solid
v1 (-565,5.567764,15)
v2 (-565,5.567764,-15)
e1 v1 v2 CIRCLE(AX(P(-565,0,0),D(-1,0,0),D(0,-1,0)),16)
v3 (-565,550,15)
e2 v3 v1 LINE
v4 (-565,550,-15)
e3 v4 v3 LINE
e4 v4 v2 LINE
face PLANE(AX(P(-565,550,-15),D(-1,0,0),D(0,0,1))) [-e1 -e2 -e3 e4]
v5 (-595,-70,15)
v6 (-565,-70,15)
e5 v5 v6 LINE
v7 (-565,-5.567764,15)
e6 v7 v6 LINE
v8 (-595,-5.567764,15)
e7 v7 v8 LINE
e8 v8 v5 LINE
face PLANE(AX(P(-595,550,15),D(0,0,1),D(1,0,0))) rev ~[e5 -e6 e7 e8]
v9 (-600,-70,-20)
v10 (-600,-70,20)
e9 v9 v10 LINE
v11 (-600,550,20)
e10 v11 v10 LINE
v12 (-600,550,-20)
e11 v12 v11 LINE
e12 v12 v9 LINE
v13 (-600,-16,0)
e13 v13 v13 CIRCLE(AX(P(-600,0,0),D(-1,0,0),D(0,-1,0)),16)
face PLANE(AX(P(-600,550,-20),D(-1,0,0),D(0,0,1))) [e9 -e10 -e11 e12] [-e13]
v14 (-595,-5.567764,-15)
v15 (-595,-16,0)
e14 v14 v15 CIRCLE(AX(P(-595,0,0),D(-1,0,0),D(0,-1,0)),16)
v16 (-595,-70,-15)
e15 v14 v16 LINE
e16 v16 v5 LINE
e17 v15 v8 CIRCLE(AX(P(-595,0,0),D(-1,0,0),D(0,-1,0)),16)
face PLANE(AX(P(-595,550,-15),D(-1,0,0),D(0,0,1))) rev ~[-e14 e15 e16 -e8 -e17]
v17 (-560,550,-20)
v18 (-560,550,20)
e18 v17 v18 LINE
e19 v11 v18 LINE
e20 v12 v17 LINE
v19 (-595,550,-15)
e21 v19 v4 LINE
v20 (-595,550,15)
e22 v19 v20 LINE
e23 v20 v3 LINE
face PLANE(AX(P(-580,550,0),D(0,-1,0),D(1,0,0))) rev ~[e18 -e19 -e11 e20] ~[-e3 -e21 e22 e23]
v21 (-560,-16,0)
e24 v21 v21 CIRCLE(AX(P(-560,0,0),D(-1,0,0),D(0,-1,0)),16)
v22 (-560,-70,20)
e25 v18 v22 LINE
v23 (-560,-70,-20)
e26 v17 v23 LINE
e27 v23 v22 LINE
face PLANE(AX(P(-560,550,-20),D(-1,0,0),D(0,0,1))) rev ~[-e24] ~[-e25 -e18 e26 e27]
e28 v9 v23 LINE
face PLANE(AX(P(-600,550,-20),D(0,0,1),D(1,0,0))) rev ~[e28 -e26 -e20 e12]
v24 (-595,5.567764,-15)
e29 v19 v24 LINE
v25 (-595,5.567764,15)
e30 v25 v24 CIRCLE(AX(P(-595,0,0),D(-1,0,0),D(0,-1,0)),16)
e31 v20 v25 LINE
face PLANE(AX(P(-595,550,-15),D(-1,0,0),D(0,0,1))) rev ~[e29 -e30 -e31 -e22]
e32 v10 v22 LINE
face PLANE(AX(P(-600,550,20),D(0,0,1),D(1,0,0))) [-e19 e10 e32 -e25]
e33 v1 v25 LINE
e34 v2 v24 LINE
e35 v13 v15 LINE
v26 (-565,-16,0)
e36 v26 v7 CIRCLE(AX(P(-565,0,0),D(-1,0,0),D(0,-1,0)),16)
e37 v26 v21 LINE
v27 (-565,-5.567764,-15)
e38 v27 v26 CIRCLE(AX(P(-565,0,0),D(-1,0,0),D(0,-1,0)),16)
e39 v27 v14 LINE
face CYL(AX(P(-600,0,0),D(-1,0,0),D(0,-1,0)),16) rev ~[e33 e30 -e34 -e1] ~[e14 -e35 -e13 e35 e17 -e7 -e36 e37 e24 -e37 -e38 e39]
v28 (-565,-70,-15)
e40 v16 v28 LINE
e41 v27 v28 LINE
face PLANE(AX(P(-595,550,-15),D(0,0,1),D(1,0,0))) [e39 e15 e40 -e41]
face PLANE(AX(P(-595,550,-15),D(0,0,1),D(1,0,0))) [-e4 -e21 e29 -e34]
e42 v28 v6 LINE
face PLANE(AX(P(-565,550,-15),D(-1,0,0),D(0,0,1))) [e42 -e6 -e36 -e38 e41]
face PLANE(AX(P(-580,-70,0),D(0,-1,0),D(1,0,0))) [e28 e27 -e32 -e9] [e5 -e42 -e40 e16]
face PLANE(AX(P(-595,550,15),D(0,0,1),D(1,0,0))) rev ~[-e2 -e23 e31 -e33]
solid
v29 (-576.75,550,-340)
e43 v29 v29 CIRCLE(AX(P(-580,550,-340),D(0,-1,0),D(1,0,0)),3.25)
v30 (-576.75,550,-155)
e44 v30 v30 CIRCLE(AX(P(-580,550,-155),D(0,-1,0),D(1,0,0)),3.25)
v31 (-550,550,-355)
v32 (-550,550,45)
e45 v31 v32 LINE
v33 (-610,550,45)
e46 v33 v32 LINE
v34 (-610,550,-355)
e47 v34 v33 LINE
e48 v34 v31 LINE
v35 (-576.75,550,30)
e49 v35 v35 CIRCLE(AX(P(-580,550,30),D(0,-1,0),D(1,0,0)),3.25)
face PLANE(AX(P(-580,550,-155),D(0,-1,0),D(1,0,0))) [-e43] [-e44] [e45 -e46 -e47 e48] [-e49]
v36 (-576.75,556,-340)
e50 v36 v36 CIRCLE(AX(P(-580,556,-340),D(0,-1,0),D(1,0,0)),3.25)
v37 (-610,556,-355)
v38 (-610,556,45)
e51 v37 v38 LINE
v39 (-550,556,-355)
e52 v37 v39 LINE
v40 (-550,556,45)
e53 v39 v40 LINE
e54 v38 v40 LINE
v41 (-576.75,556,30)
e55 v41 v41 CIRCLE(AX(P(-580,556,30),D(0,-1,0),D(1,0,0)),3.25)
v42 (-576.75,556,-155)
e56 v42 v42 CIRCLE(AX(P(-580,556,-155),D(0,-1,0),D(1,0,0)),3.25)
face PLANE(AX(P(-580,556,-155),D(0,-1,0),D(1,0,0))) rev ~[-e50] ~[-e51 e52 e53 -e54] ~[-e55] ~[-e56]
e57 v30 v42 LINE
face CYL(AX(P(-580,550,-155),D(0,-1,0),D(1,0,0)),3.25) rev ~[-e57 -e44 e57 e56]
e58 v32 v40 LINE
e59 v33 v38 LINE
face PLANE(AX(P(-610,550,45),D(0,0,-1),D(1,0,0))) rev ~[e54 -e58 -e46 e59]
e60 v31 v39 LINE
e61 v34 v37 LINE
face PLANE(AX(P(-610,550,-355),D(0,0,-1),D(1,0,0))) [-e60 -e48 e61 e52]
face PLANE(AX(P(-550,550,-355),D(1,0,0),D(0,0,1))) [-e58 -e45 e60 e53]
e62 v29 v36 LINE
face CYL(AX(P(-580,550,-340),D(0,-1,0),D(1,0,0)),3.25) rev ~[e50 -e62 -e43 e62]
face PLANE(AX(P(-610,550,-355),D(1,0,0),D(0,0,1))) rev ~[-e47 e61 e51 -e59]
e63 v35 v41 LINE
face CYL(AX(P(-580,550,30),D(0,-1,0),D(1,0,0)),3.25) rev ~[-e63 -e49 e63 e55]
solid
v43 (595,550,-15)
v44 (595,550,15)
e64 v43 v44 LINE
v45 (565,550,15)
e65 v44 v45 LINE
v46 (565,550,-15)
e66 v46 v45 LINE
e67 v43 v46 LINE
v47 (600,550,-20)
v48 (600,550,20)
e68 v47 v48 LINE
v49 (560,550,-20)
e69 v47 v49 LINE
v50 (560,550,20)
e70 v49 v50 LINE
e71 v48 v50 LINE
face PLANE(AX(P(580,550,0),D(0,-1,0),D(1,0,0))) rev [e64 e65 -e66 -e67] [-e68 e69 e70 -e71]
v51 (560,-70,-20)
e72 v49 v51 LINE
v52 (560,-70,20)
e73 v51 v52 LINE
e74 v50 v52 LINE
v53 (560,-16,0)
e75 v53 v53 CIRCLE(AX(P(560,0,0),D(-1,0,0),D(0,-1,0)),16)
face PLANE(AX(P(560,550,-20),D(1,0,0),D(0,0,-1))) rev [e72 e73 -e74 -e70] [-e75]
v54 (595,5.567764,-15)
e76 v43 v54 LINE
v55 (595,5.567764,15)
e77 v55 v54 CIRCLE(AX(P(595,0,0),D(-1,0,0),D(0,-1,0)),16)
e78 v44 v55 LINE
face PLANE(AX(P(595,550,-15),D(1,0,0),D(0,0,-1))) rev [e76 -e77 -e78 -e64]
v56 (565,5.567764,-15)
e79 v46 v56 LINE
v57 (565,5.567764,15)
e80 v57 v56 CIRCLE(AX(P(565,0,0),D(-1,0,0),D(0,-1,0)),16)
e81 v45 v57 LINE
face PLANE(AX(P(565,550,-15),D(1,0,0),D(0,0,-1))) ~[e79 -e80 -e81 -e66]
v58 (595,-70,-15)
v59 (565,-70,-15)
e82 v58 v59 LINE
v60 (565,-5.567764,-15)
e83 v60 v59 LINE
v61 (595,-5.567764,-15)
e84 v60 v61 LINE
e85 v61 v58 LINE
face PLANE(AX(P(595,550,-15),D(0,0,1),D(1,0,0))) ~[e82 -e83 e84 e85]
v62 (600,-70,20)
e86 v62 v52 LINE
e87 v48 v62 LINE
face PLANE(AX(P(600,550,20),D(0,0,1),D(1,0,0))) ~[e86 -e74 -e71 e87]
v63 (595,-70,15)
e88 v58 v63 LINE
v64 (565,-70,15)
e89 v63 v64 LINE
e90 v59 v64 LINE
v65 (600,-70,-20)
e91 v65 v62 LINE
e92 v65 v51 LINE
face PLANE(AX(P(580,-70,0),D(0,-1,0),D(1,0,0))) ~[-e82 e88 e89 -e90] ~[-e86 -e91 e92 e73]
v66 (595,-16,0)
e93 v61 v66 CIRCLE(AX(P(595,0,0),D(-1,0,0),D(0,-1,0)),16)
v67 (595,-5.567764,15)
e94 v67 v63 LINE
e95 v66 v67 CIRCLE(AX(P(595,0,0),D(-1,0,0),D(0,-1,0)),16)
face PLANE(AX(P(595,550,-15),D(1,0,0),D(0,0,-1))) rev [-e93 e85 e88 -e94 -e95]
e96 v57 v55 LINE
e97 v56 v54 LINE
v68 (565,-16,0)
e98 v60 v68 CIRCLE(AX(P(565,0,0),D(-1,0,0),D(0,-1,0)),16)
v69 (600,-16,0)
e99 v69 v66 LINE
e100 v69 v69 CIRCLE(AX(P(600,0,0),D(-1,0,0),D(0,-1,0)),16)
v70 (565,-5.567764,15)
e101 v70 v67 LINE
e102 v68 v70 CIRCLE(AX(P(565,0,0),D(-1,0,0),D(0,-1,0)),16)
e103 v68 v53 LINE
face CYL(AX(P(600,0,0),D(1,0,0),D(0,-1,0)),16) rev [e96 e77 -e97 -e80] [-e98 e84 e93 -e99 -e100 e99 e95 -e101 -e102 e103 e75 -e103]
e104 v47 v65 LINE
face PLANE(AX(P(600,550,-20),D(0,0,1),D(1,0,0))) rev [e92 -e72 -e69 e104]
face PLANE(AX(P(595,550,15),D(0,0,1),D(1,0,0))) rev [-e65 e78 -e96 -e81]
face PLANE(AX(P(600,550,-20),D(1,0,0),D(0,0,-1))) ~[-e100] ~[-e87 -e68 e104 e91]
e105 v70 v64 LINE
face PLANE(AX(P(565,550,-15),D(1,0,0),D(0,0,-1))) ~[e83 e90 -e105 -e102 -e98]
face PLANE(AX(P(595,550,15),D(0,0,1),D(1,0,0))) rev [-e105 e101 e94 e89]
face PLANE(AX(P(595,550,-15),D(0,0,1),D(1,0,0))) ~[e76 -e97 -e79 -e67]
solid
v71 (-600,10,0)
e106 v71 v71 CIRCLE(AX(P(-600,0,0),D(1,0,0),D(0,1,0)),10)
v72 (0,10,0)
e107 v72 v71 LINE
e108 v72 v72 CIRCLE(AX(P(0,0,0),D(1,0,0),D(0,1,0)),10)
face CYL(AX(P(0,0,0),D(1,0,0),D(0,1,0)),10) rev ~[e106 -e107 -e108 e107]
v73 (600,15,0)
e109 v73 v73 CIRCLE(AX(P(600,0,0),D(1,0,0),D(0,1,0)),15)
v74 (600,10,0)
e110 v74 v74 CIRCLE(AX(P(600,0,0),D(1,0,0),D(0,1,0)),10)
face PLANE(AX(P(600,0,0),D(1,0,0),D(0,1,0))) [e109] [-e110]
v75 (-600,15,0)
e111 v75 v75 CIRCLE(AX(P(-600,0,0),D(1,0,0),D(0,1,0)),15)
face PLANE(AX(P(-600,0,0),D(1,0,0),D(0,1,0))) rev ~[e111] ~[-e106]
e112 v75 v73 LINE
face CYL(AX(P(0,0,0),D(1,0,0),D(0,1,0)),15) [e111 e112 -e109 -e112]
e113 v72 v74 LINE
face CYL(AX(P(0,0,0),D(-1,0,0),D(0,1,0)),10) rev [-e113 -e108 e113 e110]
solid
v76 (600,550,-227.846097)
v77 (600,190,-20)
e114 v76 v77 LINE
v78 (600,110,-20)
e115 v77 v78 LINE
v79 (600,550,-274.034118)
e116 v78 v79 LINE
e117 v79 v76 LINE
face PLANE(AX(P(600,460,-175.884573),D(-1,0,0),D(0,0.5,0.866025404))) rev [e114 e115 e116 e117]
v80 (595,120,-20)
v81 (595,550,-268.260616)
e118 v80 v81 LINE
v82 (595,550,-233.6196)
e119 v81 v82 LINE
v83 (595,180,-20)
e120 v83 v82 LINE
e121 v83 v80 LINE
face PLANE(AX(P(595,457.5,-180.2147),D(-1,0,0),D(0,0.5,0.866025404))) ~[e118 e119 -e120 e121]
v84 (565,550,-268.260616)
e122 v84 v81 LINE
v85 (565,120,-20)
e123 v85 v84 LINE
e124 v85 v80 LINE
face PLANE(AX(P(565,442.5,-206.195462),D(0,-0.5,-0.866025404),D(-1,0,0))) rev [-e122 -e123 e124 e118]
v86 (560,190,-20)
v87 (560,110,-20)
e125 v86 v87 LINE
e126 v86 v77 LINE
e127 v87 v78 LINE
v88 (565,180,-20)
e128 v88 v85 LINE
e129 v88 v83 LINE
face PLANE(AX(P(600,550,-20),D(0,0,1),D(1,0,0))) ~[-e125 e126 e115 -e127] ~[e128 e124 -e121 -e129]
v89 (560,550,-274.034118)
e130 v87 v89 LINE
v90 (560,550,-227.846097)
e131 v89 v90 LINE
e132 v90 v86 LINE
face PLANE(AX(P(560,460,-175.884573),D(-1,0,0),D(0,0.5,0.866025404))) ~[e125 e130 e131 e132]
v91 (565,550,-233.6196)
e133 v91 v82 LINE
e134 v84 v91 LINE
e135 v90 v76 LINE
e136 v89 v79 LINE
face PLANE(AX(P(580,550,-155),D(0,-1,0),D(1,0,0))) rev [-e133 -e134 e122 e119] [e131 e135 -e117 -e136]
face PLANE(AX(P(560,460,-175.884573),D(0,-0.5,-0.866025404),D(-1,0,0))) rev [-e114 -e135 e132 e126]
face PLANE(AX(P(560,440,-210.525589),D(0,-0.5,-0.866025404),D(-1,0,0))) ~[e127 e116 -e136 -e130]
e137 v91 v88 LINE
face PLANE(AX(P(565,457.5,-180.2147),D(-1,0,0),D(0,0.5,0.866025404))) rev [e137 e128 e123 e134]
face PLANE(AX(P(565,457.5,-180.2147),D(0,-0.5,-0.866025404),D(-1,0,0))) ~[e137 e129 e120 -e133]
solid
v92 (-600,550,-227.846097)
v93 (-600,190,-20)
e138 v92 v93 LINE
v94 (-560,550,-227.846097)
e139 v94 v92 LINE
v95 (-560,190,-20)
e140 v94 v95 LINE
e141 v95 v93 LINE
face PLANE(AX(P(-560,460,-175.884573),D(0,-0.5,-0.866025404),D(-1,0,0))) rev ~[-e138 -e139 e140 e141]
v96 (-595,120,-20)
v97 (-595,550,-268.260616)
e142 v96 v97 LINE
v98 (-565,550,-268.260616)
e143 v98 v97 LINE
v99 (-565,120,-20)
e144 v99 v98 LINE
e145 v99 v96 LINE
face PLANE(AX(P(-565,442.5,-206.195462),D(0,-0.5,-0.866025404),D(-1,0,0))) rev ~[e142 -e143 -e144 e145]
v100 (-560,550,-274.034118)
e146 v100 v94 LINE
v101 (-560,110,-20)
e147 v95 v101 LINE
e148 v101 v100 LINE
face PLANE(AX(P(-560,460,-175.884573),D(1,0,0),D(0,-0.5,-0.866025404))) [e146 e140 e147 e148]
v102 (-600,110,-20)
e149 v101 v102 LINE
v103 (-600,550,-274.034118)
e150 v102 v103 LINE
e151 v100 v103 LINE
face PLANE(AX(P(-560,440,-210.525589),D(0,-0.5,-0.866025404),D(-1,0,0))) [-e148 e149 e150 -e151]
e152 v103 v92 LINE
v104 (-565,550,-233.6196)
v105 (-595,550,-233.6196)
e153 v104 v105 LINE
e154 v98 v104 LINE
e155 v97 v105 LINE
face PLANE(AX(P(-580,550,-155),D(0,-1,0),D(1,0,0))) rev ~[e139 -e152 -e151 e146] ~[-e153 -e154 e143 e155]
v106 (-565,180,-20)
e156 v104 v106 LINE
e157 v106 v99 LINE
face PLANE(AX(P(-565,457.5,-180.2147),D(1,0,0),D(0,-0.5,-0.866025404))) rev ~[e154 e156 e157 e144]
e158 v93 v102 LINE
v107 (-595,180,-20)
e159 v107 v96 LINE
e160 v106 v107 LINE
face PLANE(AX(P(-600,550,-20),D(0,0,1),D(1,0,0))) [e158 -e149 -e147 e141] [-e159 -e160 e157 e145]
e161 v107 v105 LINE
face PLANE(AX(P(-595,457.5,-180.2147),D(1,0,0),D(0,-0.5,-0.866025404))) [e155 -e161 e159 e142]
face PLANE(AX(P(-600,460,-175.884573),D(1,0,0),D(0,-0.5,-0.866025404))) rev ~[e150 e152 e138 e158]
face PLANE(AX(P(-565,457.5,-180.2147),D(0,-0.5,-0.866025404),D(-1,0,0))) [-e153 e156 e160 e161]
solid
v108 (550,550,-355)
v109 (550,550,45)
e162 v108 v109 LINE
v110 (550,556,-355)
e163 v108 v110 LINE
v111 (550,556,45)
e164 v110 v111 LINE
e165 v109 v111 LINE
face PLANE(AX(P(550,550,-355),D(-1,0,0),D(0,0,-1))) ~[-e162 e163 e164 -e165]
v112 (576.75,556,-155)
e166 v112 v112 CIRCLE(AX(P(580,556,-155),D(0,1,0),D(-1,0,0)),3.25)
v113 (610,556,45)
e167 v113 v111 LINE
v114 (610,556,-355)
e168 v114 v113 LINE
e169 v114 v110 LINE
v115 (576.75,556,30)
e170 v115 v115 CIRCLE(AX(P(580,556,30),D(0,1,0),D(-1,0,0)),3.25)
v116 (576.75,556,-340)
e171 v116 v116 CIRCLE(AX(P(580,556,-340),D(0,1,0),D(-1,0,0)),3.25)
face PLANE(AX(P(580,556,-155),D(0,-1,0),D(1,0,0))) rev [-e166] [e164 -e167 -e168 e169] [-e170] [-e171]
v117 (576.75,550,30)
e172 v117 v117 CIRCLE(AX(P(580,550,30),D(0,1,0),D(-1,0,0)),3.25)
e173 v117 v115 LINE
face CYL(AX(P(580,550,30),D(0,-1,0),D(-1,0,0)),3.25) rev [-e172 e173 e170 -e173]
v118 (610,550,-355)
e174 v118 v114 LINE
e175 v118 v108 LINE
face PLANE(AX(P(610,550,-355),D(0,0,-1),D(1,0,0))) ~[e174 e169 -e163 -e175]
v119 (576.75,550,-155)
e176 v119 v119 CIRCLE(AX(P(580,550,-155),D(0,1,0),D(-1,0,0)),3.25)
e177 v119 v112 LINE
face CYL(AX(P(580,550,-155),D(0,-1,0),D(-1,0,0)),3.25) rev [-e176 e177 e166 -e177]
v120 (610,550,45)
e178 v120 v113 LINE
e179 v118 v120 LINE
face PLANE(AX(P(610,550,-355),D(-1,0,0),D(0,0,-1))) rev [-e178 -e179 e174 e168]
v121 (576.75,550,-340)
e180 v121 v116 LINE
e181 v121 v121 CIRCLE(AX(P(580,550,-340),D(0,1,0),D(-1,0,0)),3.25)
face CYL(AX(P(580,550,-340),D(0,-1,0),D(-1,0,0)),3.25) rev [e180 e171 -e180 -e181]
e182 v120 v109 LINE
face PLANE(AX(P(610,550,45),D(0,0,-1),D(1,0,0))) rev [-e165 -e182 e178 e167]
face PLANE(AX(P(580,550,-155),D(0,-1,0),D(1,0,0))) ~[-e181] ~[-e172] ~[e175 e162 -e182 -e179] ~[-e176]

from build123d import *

# Parameters (mm, degrees)
F0_R          = 15
F0_R_2        = 10
F1_DEPTH      = 600
F1_DEPTH_BACK = 600
F3_W          = 40
F3_H          = 40
F3_W_2        = 30
F3_H_2        = 30
F4_DEPTH      = 620
F5_R          = 16
F6_DEPTH      = 53.9
F7_W          = 60
F7_H          = 400
F7_R          = 3.25
F8_DEPTH      = 6
F10_W         = 40
F10_H         = 40
F10_W_2       = 30
F10_H_2       = 30
F11_FACE_W    = 40
F11_FACE_H    = 40
F11_FACE_W_2  = 30
F11_FACE_H_2  = 30
F12_REACH     = 626.0052928413


with BuildPart() as f1:
    # F0 (on Right) → F1 (new body, two sides)
    with BuildSketch(Plane.YZ) as f1_sk:
        Circle(F0_R)
        Circle(F0_R_2, mode=Mode.SUBTRACT)
    extrude(amount=F1_DEPTH)
    extrude(f1_sk.sketch, amount=-F1_DEPTH_BACK)


with BuildPart() as f4:
    # F3 (on offset) → F4 (new body)
    with BuildSketch(Plane.XZ.offset(-550)):
        with Locations((-580, 0)):
            Rectangle(F3_W, F3_H)
        with Locations((-580, 0)):
            Rectangle(F3_W_2, F3_H_2, mode=Mode.SUBTRACT)
    extrude(amount=F4_DEPTH)

    # F5 (on face) → F6 (cut)
    with BuildSketch(Plane(origin=(-600, 0, 0), x_dir=(0, -1, 0), z_dir=(-1, 0, 0))):
        Circle(F5_R)
    extrude(amount=-F6_DEPTH, mode=Mode.SUBTRACT)


with BuildPart() as f8:
    # F7 (on offset) → F8 (new body)
    with BuildSketch(Plane.XZ.offset(-550)):
        with Locations((-580, -155)):
            Rectangle(F7_W, F7_H)
        with Locations((-580, -340)):
            Circle(F7_R, mode=Mode.SUBTRACT)
        with Locations((-580, -155)):
            Circle(F7_R, mode=Mode.SUBTRACT)
        with Locations((-580, 30)):
            Circle(F7_R, mode=Mode.SUBTRACT)
    extrude(amount=-F8_DEPTH)


with BuildPart() as f11:
    # F10 (on face) → F11 (new body, up to the next surface of F8)
    with BuildSketch(Plane(origin=(0, 421.1602540378, -243.1569860407), x_dir=(-1, 0, 0), z_dir=(0, 0.8660254038, -0.5))):
        with Locations((580, 57.6794919243)):
            Rectangle(F10_W, F10_H)
        with Locations((580, 57.6794919243)):
            Rectangle(F10_W_2, F10_H_2, mode=Mode.SUBTRACT)
    extrude(until=Until.NEXT, target=f8.part)

    f12_end = f4.part.faces().sort_by_distance((-580, 240, -20))[0]
    # F11_face (on face) → F12 (join, up to a face of F4 that its end follows)
    with BuildSketch(Plane(origin=(-580, 450, -193.2050807569), x_dir=(-1, 0, 0), z_dir=(0, -0.8660254038, 0.5))):
        Rectangle(F11_FACE_W, F11_FACE_H)
        Rectangle(F11_FACE_W_2, F11_FACE_H_2, mode=Mode.SUBTRACT)
    f12_long = extrude(amount=F12_REACH, mode=Mode.PRIVATE)
    add(split(f12_long, bisect_by=f12_end, keep=Keep.TOP, mode=Mode.PRIVATE))


with BuildPart() as f13_1:
    # F13: instance of F4
    add(f4.part.mirror(Plane.YZ))


with BuildPart() as f13_2:
    # F13: instance of F8
    add(f8.part.mirror(Plane.YZ))


with BuildPart() as f13_3:
    # F13: instance of F11
    add(f11.part.mirror(Plane.YZ))


solid = Compound([f1.part, f4.part, f8.part, f11.part, f13_1.part, f13_2.part, f13_3.part])
